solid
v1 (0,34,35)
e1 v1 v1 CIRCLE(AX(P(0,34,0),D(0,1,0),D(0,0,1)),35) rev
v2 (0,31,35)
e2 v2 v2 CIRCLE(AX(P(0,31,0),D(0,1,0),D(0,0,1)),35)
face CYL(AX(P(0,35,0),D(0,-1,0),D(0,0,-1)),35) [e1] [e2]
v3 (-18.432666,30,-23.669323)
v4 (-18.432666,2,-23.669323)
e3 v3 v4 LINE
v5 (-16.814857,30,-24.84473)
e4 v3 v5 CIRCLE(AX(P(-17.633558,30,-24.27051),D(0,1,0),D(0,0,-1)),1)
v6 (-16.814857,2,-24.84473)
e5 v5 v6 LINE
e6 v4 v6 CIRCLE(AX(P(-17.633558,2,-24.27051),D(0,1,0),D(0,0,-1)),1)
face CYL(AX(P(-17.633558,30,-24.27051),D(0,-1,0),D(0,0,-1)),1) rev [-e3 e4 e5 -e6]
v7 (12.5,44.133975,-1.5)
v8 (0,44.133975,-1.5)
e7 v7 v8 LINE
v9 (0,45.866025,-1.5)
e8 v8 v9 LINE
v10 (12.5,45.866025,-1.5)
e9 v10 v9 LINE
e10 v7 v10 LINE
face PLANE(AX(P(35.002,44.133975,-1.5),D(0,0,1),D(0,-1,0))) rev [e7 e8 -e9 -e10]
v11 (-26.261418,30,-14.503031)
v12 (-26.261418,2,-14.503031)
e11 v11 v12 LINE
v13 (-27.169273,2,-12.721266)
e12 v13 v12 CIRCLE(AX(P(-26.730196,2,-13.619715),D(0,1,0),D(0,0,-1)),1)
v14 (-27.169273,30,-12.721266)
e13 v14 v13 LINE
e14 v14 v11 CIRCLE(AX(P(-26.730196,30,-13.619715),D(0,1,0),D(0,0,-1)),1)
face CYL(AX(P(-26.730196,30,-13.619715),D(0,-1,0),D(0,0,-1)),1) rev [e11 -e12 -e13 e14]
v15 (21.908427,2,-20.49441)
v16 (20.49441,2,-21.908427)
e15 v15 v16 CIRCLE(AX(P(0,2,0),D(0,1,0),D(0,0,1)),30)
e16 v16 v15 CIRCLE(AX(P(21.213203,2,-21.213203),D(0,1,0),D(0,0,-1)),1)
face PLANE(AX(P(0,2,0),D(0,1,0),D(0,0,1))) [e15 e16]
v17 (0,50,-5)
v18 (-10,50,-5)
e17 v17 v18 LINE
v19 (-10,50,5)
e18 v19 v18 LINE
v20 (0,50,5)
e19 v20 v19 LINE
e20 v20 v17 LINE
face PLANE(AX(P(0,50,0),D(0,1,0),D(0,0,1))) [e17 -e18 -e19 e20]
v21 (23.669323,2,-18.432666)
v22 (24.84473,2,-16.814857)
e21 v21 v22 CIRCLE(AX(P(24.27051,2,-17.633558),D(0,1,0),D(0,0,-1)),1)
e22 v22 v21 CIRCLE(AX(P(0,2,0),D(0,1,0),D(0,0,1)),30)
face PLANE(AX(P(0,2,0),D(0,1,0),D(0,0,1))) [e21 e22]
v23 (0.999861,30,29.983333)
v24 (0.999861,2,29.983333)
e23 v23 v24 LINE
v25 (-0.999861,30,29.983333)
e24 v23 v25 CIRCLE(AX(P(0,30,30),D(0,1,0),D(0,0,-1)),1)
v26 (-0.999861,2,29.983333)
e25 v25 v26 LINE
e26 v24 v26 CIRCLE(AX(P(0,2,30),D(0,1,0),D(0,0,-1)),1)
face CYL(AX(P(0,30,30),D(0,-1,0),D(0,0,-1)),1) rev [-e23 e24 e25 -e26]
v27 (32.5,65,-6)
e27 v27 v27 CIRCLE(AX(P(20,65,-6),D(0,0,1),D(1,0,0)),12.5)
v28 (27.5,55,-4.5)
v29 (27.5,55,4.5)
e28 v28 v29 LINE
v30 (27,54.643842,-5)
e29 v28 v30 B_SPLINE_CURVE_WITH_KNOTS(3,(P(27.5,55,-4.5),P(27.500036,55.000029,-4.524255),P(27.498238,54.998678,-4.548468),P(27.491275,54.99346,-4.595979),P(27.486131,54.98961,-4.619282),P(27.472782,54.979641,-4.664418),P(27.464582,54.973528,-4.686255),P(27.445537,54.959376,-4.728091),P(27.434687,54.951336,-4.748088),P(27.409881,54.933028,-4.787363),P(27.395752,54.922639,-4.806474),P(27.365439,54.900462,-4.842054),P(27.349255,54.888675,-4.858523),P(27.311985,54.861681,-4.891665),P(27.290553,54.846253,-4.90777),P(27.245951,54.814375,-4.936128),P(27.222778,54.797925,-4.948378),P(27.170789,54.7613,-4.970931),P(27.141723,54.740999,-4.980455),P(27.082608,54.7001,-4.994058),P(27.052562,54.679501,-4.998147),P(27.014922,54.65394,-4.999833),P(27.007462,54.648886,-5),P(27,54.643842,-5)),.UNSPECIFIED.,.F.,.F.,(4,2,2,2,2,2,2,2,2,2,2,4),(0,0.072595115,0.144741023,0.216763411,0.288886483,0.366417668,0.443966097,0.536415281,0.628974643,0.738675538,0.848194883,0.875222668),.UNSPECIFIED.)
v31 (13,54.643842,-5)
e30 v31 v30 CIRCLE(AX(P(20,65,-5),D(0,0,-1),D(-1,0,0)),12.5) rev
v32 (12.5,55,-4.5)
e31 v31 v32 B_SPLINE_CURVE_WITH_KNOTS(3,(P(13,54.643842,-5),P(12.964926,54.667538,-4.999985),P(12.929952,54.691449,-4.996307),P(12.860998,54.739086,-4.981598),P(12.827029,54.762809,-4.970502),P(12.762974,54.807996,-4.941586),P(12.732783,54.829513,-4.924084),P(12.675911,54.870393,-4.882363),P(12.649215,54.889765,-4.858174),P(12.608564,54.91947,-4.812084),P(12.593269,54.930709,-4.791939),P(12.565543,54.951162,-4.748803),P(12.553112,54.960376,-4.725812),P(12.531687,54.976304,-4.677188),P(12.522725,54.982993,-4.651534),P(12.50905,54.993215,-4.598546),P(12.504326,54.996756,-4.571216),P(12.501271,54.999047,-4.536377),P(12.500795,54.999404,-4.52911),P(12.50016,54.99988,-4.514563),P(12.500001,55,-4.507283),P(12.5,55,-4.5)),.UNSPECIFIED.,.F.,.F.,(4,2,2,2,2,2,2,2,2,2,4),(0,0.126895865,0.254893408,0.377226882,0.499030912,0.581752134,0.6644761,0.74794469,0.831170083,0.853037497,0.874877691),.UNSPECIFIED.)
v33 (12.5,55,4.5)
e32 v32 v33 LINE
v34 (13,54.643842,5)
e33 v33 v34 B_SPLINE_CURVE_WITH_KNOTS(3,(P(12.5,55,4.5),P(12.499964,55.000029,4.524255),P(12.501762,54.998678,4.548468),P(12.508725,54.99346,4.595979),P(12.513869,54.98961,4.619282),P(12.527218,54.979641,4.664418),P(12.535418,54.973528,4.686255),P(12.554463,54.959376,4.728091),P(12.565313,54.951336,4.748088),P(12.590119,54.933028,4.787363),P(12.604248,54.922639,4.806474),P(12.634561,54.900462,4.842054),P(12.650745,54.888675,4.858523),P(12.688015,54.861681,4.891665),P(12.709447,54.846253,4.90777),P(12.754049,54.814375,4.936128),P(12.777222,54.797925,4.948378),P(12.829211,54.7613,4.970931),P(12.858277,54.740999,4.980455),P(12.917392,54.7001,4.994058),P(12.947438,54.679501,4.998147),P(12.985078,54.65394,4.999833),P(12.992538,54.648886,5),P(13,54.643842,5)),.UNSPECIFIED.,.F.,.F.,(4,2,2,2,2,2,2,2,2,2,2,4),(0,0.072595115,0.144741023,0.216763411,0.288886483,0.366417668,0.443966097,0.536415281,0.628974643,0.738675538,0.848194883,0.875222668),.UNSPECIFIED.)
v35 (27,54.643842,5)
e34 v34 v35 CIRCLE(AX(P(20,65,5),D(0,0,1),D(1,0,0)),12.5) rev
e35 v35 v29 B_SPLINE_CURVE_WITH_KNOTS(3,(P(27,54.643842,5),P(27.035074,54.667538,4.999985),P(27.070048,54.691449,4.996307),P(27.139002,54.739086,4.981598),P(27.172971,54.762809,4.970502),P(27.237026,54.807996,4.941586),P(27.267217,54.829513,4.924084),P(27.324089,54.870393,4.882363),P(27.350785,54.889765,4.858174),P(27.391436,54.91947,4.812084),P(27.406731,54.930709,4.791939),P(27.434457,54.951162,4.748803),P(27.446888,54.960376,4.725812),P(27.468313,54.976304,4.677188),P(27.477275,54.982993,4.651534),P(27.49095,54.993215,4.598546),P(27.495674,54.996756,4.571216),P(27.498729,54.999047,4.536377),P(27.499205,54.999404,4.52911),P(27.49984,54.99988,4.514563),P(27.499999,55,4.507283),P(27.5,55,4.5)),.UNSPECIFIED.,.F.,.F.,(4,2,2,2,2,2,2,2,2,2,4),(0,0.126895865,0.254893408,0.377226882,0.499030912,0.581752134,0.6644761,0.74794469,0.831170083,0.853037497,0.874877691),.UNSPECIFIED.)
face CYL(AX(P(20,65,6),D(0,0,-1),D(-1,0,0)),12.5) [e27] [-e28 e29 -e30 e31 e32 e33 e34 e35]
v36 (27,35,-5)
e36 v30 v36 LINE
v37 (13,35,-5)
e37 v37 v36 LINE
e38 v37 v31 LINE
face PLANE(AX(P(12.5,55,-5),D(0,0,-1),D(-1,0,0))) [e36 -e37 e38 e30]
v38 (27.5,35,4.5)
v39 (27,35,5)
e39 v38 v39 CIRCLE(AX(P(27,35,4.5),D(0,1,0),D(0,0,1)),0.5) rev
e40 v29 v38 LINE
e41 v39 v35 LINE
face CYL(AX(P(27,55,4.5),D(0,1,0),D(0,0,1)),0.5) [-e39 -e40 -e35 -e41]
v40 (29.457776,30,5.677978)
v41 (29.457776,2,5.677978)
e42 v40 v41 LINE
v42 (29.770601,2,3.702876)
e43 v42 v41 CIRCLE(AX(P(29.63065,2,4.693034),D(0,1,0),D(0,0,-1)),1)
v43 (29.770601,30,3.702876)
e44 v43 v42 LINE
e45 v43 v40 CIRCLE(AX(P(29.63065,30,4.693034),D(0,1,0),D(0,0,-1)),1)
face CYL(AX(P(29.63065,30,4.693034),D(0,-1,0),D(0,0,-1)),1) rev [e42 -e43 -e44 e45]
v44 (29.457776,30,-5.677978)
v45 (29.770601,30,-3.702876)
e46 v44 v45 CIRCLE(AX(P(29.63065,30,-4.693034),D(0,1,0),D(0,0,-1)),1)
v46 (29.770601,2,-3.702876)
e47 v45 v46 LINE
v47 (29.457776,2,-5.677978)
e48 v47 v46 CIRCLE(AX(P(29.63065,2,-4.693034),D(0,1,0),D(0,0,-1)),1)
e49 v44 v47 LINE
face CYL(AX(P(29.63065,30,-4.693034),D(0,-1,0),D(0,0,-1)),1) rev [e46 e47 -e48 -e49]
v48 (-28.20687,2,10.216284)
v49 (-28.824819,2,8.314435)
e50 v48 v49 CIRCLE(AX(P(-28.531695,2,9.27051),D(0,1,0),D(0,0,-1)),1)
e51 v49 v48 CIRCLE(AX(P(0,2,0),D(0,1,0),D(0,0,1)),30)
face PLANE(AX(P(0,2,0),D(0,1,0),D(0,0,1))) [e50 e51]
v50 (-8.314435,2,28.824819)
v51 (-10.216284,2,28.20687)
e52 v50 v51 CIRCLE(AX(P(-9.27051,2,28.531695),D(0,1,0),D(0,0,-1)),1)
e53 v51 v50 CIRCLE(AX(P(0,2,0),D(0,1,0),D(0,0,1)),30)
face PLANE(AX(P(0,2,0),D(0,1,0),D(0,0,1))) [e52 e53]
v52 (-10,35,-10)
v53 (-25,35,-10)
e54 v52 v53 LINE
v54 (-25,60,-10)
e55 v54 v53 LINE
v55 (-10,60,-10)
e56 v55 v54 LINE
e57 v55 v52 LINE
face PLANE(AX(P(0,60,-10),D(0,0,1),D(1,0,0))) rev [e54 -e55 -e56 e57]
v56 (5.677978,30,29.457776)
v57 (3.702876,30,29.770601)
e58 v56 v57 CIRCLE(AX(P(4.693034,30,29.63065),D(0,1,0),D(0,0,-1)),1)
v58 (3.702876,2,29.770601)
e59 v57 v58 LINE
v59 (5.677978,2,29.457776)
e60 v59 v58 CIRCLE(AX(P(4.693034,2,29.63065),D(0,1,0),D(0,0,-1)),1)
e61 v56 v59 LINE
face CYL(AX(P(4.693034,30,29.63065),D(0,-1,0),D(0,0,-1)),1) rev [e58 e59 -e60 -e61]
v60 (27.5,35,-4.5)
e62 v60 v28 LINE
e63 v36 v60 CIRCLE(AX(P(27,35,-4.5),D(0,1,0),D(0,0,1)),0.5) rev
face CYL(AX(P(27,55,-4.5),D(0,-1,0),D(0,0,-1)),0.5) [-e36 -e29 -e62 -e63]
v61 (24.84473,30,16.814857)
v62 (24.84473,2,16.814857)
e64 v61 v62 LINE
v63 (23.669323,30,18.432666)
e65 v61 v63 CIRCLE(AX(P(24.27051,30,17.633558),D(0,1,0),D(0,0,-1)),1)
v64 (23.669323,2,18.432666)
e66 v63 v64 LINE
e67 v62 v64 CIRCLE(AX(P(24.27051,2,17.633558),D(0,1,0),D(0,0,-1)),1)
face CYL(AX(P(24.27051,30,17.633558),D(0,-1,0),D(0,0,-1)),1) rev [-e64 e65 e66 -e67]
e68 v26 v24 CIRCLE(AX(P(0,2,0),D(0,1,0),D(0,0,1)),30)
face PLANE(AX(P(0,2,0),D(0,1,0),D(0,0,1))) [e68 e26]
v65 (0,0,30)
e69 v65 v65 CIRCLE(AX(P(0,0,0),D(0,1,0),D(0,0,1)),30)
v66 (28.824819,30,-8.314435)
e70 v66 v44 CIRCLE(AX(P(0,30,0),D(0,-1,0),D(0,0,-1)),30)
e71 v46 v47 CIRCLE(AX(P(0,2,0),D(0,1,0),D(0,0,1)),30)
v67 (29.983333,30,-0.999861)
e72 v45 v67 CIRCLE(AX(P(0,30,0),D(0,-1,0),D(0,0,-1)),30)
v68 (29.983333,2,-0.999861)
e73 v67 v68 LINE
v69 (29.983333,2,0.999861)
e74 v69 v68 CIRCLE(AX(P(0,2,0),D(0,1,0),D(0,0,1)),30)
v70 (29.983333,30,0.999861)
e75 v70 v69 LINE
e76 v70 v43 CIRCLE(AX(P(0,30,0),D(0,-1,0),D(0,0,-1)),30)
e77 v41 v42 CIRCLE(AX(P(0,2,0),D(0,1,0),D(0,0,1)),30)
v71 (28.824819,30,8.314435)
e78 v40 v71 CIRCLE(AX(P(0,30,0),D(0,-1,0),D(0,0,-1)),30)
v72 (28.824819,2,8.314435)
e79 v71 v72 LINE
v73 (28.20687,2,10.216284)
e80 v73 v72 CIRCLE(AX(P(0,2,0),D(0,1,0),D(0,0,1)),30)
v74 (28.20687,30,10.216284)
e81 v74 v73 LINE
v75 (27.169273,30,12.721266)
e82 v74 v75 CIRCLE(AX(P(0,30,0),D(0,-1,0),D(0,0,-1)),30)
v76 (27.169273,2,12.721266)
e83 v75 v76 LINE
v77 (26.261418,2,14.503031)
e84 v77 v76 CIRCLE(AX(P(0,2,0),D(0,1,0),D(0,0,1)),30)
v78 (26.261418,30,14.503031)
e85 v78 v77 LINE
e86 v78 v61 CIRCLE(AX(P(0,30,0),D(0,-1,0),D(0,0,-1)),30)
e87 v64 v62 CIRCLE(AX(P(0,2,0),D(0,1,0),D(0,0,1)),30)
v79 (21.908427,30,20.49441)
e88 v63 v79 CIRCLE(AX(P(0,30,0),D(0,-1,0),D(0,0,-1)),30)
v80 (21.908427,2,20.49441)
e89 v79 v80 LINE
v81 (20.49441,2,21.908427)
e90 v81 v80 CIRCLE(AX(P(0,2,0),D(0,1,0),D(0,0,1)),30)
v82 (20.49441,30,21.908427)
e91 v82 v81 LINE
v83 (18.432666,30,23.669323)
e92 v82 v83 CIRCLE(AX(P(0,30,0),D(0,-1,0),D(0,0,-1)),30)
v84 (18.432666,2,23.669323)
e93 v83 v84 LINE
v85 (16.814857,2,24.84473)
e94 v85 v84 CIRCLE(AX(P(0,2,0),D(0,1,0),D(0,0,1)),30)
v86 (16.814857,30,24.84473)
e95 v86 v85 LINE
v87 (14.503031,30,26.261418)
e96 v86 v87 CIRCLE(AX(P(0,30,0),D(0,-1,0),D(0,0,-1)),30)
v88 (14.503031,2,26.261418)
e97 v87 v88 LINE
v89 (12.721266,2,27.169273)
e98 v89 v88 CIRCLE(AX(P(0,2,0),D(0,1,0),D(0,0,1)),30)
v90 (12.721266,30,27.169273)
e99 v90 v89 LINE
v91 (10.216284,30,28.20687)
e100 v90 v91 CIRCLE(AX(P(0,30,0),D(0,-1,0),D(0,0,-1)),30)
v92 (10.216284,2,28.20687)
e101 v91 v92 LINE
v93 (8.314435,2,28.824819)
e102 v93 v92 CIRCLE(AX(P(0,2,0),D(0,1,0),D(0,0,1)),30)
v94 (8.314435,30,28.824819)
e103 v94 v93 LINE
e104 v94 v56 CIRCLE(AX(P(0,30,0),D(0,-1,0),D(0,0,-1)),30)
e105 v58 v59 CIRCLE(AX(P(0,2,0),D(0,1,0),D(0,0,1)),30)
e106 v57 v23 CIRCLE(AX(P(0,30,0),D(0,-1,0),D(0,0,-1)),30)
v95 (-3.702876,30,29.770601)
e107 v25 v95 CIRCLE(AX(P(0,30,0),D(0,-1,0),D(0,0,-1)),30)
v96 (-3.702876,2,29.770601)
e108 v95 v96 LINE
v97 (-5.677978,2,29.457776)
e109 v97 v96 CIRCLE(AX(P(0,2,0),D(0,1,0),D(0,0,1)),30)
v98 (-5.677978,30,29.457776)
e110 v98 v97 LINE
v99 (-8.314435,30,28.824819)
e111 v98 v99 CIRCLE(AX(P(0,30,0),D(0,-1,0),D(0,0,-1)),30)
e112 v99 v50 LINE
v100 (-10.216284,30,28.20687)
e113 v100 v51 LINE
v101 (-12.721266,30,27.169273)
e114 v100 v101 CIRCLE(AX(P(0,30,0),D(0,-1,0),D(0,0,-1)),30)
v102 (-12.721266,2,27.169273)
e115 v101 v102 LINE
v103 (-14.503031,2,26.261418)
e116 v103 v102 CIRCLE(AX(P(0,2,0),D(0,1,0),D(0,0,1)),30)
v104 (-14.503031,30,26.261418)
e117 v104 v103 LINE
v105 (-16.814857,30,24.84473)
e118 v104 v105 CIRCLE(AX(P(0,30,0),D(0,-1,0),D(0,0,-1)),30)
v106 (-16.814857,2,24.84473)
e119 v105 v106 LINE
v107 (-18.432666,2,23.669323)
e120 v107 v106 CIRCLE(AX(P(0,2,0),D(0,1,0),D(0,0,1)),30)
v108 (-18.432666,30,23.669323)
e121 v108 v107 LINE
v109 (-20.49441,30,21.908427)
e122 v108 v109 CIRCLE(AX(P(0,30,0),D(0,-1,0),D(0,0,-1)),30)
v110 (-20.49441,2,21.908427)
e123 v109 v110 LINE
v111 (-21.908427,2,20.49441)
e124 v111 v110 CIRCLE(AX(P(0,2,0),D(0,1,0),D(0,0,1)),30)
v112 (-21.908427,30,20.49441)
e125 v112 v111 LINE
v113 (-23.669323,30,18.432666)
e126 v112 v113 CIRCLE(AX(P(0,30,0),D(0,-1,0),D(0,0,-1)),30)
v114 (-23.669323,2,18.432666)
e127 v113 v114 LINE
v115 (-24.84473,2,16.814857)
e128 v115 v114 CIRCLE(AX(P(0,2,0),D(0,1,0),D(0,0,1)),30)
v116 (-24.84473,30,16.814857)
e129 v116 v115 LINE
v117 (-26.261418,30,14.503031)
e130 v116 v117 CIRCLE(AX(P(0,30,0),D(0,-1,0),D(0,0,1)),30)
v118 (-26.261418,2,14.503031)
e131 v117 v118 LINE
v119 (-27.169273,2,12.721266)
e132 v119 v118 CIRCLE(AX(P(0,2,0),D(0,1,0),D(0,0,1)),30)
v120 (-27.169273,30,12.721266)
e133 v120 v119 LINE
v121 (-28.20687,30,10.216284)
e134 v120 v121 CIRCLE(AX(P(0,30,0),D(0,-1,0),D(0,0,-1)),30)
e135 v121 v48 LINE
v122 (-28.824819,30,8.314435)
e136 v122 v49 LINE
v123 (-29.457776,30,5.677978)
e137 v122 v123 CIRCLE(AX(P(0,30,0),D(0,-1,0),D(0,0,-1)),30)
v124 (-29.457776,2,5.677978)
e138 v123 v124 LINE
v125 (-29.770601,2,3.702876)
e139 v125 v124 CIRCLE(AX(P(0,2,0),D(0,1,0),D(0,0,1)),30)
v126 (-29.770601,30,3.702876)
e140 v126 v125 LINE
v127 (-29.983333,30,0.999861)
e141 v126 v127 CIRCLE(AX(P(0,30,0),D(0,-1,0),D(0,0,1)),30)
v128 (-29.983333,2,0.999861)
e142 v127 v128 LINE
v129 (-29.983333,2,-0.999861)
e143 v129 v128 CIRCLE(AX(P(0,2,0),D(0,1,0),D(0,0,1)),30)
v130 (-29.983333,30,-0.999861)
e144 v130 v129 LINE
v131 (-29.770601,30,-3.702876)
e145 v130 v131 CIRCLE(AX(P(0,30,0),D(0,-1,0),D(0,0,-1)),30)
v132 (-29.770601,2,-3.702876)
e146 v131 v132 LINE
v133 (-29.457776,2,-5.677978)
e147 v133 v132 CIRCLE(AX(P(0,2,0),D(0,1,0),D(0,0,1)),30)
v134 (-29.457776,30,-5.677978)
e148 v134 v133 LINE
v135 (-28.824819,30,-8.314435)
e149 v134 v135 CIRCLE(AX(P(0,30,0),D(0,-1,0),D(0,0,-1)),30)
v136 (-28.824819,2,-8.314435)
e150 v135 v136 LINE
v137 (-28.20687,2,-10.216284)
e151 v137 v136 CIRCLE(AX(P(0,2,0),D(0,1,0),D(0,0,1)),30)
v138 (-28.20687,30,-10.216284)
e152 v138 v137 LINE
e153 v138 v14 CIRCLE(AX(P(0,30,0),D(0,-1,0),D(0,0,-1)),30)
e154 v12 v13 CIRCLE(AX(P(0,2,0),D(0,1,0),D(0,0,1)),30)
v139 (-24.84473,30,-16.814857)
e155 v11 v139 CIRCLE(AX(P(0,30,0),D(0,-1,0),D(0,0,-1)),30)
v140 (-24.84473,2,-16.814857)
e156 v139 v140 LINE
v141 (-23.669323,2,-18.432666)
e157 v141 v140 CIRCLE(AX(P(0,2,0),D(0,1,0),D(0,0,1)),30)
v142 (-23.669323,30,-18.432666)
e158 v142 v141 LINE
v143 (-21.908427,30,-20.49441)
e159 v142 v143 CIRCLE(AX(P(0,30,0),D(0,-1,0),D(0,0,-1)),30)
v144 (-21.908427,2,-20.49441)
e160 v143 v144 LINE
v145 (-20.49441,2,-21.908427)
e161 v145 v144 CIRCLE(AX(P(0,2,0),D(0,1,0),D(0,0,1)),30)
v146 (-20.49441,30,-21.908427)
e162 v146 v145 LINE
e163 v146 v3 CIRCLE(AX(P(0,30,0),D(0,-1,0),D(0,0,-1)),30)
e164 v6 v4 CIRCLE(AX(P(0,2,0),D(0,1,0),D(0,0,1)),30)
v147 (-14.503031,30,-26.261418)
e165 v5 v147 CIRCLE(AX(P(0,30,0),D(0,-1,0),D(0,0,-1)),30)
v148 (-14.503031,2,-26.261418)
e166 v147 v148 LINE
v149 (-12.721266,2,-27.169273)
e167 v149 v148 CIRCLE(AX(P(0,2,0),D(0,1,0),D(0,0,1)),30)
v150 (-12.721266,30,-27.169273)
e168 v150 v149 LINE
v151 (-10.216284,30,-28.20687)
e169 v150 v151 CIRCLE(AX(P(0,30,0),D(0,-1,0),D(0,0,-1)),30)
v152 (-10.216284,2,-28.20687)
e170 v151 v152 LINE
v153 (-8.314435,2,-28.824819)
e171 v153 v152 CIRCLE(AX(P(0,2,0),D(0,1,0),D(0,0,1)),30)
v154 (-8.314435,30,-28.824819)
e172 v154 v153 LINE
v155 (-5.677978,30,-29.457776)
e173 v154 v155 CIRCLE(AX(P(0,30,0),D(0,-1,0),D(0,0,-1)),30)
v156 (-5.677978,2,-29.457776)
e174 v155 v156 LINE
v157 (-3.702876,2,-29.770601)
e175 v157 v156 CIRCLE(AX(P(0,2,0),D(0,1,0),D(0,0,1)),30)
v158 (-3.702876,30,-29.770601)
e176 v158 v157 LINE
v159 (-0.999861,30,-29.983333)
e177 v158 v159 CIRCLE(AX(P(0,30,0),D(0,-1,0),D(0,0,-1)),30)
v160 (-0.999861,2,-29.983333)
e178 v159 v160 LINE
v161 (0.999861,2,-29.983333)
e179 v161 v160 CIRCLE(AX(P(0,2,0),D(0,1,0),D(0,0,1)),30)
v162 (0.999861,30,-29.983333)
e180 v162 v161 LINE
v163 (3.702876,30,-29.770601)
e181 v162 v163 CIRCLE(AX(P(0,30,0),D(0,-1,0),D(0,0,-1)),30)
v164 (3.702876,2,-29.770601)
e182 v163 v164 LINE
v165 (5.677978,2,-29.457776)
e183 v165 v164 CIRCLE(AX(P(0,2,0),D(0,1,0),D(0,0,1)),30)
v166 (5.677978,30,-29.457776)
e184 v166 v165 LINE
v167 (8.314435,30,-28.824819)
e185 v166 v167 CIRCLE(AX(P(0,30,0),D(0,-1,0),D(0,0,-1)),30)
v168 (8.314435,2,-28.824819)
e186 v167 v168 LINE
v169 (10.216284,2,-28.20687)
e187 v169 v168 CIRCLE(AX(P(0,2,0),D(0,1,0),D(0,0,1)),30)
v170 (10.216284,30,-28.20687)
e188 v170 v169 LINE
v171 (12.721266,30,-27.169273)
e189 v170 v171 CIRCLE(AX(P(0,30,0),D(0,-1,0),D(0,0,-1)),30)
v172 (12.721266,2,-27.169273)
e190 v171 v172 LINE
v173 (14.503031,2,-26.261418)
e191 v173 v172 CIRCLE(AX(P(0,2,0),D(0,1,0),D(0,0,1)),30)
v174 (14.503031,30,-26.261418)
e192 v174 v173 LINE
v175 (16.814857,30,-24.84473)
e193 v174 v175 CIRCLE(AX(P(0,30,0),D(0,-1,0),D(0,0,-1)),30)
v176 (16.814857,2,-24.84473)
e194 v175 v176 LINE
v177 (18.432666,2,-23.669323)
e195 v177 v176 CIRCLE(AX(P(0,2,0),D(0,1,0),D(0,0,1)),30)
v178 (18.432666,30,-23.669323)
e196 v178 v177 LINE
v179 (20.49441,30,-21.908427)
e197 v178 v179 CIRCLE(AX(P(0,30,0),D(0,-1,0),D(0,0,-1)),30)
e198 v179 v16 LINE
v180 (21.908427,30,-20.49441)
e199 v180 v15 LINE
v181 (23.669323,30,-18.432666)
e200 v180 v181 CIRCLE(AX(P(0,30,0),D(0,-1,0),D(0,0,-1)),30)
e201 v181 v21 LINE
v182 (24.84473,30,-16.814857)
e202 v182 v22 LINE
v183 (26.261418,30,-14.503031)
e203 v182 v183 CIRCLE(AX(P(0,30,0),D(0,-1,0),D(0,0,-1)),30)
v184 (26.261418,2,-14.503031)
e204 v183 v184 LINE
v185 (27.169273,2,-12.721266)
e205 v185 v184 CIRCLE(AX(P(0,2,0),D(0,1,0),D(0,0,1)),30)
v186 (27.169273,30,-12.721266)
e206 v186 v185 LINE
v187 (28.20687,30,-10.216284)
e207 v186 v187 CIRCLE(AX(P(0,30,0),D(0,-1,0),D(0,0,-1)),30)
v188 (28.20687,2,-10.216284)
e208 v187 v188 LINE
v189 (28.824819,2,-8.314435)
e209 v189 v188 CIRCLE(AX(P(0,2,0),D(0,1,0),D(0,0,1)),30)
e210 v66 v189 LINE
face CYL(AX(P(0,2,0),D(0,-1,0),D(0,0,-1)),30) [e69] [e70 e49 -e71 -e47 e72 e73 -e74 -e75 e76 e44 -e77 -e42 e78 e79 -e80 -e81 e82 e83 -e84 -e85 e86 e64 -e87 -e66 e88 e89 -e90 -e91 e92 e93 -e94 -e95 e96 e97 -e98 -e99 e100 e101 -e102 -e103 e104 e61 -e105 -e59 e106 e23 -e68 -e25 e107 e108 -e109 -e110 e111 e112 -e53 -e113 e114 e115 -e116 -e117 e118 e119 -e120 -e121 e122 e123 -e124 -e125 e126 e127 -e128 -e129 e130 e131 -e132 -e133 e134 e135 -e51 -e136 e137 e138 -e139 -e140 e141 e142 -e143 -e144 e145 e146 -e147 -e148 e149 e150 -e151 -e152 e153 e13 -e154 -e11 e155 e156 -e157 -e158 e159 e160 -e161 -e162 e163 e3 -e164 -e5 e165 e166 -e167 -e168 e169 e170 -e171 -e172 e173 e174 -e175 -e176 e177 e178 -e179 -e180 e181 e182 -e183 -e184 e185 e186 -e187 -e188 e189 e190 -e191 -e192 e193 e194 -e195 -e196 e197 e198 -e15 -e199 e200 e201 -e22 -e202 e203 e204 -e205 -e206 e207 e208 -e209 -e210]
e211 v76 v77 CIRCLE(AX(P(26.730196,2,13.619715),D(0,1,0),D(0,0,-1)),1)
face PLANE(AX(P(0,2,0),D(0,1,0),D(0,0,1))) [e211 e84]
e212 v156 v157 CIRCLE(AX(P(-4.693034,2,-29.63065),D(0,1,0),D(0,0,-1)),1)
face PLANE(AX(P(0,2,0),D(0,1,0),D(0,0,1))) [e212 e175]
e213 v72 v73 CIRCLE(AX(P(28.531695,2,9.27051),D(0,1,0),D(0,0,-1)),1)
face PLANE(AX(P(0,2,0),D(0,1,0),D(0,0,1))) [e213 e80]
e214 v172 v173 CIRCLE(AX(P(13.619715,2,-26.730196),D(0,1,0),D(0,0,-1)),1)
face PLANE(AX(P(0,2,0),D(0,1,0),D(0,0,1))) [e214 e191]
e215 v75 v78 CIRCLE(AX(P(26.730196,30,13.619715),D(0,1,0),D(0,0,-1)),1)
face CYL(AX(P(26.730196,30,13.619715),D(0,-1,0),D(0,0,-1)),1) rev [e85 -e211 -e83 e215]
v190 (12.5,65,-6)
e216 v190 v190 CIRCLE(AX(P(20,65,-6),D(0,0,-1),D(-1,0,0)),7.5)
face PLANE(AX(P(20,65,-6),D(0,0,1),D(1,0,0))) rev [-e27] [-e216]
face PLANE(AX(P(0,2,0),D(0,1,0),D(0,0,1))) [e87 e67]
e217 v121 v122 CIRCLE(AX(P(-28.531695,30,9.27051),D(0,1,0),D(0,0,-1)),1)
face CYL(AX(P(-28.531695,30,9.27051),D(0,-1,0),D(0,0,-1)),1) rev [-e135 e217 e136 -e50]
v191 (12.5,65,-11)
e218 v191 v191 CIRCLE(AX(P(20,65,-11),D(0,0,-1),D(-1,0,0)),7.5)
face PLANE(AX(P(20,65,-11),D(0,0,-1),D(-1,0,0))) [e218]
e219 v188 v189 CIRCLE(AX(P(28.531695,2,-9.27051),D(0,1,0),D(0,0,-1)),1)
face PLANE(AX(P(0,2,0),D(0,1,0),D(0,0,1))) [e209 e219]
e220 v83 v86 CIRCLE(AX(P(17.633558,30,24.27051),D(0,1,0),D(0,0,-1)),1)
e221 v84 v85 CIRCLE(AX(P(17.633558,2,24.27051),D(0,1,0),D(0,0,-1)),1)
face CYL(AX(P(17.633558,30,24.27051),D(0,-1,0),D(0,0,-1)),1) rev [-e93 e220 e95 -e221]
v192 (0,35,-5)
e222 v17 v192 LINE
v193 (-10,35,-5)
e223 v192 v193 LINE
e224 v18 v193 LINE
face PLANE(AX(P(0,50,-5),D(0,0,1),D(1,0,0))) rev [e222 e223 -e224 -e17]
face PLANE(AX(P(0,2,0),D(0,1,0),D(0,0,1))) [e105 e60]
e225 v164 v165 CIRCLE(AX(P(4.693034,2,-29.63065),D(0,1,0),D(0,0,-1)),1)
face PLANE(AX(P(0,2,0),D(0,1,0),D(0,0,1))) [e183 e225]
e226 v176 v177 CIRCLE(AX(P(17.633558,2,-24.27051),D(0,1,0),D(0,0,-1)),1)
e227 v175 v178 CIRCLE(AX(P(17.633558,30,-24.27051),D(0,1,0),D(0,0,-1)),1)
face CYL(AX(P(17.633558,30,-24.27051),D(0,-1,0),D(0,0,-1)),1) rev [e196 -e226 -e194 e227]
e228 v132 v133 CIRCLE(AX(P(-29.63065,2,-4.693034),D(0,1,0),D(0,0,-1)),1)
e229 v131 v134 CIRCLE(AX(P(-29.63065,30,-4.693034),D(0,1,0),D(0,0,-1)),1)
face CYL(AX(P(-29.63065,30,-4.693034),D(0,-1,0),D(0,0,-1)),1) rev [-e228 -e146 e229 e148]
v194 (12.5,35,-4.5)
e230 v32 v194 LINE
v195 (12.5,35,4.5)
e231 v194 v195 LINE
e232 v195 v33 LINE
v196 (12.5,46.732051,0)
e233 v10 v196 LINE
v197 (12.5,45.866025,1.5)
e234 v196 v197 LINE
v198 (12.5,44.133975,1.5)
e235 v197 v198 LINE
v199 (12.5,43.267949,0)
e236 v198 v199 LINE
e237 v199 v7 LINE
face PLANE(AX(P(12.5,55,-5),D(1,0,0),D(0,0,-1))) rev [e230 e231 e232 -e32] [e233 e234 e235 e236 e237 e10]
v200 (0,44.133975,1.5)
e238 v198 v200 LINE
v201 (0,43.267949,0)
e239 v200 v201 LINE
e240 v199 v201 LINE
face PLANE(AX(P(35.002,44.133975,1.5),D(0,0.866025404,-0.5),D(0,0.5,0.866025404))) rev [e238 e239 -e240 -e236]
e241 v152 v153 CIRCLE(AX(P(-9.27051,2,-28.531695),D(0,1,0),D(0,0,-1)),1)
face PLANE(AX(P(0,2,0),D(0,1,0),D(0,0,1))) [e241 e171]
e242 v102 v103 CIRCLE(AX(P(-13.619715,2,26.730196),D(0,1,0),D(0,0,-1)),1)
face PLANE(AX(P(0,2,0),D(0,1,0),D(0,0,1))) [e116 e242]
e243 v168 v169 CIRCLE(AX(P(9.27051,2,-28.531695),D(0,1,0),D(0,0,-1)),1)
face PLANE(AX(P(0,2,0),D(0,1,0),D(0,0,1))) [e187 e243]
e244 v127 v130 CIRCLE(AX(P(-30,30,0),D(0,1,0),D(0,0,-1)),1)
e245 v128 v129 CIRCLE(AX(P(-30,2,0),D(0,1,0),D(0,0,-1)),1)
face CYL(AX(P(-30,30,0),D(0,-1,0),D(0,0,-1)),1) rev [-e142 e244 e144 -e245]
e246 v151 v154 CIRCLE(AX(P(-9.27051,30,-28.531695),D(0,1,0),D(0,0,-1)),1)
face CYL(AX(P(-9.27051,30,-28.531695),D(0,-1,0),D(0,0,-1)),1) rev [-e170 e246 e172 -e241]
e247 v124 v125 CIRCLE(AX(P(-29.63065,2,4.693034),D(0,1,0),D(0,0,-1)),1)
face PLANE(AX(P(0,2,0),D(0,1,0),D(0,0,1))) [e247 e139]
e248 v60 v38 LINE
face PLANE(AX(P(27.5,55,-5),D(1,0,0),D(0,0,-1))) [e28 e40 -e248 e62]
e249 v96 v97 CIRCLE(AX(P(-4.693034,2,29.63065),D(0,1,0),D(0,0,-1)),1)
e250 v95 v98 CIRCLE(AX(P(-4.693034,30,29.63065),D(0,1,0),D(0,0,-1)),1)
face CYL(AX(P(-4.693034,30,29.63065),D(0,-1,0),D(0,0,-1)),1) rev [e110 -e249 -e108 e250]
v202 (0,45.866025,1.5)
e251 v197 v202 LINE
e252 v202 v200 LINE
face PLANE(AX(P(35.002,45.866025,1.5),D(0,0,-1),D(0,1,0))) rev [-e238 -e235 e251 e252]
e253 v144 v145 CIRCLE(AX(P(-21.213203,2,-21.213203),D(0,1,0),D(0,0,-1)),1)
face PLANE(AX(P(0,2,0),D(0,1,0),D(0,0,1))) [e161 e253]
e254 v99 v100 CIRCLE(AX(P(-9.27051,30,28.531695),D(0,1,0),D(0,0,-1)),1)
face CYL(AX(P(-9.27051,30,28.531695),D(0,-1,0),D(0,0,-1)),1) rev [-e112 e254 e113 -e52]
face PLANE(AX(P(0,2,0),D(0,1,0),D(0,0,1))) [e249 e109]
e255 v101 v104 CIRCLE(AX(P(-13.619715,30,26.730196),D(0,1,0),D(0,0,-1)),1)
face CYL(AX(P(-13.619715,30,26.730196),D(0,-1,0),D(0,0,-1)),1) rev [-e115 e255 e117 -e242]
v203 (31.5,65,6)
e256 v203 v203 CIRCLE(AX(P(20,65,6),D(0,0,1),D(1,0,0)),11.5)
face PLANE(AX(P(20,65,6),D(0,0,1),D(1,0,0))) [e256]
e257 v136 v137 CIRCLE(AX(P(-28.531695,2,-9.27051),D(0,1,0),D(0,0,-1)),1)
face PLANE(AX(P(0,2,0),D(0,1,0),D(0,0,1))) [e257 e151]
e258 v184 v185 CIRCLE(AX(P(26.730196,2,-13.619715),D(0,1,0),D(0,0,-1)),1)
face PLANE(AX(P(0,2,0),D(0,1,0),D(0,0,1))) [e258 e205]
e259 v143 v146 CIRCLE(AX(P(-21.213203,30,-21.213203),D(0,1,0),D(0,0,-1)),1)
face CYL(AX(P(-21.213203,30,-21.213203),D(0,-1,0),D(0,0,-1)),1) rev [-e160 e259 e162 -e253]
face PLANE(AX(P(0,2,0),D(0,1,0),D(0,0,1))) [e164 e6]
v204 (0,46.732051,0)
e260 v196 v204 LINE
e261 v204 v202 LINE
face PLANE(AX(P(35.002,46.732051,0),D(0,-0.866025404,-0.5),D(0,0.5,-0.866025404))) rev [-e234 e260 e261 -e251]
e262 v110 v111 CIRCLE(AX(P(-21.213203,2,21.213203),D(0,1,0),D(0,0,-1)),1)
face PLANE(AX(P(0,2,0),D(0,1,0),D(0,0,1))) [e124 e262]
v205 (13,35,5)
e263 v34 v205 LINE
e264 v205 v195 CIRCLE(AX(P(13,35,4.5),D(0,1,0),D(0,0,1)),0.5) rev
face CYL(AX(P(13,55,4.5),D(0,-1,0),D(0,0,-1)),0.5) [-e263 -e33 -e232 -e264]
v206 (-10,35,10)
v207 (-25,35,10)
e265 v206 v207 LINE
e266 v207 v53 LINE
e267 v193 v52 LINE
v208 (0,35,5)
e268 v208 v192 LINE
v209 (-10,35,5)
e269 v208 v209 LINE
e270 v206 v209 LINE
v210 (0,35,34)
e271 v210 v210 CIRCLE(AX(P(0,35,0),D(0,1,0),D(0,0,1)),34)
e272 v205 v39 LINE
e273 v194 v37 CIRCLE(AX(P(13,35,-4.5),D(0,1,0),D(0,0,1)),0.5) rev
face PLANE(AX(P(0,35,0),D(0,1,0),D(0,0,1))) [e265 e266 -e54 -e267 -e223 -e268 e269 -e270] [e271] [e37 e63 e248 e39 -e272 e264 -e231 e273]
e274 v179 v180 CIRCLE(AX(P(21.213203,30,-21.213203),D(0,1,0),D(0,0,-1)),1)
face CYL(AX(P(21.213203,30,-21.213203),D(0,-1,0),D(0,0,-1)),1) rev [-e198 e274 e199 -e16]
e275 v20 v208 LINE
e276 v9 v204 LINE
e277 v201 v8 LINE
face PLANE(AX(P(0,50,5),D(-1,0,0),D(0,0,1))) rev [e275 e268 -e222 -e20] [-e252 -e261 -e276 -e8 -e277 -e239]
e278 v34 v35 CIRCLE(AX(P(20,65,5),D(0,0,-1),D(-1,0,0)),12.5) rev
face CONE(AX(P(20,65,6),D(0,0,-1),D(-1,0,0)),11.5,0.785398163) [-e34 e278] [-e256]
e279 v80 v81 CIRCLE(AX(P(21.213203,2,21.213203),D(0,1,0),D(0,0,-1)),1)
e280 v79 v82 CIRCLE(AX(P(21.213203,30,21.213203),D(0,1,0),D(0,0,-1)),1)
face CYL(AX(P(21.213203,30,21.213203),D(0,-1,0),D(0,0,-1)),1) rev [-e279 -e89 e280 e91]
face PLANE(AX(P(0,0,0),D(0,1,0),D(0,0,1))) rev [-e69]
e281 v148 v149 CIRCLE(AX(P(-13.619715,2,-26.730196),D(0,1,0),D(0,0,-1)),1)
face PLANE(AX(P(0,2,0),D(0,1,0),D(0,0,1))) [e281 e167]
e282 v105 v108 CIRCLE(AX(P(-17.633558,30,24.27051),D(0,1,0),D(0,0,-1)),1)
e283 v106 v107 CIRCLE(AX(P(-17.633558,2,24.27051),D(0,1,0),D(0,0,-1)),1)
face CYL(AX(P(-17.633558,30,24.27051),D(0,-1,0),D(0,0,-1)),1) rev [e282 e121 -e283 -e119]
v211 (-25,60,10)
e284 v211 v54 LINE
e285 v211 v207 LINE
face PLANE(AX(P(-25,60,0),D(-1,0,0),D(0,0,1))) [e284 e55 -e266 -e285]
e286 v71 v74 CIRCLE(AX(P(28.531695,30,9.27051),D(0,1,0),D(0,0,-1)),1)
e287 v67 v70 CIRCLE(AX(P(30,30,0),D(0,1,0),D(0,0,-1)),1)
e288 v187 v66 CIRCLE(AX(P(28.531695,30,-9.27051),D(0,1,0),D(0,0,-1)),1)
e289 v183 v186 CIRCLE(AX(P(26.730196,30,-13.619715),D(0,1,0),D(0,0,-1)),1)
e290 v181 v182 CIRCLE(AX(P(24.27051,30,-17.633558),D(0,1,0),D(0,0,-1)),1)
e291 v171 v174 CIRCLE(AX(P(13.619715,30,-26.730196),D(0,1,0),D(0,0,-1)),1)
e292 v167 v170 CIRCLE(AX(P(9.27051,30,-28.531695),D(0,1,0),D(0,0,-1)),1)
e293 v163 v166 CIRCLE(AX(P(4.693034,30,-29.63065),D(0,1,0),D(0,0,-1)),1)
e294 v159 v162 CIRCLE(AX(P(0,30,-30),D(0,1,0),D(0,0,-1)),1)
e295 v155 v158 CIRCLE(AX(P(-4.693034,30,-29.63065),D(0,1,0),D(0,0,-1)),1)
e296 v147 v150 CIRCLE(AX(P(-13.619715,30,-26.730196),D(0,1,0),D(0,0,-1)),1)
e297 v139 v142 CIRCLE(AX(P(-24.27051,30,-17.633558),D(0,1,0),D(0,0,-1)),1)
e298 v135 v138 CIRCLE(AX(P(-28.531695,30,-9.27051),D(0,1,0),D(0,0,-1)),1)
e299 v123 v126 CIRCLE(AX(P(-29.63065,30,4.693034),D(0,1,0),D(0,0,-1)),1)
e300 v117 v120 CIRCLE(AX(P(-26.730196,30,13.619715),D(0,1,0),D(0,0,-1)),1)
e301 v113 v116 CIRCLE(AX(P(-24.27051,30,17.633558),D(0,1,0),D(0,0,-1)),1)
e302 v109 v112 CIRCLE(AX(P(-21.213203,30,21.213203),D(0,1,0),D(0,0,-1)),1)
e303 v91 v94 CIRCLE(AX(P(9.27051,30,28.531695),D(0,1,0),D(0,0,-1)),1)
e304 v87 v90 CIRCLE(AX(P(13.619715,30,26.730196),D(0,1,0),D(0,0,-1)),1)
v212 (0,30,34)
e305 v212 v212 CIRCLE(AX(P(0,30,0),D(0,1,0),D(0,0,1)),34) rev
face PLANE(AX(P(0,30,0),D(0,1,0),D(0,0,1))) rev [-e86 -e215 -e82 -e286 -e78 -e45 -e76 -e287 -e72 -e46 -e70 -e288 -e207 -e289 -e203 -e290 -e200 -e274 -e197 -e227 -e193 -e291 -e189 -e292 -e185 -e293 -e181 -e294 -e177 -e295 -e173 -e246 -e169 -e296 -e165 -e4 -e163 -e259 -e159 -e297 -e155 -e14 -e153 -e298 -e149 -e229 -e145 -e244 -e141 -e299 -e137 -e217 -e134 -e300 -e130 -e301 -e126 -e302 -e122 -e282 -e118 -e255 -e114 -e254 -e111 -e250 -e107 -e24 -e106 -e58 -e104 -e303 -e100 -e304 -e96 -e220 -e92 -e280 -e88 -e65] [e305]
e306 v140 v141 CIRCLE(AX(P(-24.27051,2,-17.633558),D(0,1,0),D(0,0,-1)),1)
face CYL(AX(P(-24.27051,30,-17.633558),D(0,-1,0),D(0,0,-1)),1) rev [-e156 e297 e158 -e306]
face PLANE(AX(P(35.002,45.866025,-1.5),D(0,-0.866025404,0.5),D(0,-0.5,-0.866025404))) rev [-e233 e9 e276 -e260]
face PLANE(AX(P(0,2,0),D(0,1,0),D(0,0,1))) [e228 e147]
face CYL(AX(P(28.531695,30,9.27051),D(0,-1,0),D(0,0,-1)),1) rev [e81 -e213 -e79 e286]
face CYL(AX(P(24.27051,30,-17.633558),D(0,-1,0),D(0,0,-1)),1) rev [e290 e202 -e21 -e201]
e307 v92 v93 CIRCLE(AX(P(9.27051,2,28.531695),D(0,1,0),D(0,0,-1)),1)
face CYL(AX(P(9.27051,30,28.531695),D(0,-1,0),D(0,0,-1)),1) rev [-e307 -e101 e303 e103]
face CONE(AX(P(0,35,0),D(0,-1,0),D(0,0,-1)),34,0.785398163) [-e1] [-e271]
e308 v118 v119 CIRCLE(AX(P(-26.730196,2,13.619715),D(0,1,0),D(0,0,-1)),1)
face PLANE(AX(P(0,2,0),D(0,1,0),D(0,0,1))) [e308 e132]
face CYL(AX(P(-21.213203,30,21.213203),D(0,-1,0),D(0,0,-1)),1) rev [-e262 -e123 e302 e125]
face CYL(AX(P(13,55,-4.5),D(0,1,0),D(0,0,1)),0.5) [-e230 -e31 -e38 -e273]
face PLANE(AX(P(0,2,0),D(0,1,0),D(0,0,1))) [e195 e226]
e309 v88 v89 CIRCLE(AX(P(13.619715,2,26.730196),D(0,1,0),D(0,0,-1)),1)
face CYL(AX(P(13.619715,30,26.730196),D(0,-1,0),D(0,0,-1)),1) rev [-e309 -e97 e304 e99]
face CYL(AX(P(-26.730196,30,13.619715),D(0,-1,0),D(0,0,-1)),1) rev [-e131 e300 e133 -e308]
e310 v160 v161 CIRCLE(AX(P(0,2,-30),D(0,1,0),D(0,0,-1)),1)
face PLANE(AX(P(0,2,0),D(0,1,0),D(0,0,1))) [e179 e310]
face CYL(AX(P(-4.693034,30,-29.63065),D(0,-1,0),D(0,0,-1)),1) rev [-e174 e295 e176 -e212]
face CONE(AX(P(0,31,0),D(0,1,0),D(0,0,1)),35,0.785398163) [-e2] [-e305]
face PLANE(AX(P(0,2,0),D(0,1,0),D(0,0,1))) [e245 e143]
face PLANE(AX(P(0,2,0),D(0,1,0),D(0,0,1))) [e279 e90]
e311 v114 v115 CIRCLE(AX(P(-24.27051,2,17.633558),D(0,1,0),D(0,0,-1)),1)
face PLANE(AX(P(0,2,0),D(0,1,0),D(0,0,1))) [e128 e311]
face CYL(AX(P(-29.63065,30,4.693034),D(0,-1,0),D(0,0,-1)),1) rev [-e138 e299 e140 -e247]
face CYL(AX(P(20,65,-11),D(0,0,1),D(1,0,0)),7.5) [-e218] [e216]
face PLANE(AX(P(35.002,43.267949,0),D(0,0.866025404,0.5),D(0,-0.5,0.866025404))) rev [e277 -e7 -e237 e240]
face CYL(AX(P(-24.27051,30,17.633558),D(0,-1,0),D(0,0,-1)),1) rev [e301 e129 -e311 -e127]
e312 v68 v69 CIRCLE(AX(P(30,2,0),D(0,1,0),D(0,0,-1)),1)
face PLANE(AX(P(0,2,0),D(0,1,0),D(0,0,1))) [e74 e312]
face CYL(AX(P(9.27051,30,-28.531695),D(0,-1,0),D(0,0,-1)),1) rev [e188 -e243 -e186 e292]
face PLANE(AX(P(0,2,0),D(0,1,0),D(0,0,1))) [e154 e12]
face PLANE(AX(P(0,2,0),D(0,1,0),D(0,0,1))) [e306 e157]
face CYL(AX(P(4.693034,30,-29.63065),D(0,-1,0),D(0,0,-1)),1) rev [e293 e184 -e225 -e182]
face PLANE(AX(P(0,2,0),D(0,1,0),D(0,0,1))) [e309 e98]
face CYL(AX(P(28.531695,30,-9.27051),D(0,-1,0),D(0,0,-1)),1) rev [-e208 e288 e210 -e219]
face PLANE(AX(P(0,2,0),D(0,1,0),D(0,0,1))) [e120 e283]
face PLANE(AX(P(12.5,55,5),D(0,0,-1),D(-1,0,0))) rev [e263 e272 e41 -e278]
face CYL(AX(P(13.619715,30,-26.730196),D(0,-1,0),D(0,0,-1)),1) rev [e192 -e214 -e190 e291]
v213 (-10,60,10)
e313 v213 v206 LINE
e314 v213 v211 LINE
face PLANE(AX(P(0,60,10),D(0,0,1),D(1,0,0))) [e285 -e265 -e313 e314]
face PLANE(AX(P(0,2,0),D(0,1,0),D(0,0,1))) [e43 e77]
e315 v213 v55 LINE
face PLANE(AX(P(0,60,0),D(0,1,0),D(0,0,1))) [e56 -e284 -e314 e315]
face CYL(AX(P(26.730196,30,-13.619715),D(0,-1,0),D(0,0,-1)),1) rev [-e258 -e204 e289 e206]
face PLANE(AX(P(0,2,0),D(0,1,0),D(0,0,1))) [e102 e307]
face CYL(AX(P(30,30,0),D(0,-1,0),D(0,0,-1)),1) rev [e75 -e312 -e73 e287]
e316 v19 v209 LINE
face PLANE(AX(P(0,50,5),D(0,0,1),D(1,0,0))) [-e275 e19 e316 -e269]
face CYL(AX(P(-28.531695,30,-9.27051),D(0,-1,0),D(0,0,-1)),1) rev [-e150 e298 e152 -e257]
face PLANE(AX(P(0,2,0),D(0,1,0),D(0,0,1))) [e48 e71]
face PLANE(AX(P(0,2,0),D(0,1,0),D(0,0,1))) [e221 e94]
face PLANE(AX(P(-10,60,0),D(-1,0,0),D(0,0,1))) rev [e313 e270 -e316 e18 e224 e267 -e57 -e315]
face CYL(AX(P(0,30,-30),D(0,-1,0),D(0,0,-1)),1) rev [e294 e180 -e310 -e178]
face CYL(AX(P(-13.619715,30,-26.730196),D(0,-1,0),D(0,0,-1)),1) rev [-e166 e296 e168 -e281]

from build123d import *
from build123d.topology import SkipClean

# Parameters (mm, degrees)
SKETCH1_R                = 30
BOSS_EXTRUDE1_DEPTH      = 2
BOSS_EXTRUDE2_DEPTH      = 28
SKETCH3_R                = 35
BOSS_EXTRUDE3_DEPTH      = 5
SKETCH4_W                = 15
SKETCH4_H                = 20
BOSS_EXTRUDE4_DEPTH      = 25
SKETCH4_3_W              = 10
SKETCH4_3_H              = 10
BOSS_EXTRUDE5_DEPTH      = 15
SKETCH4_4_W              = 15
SKETCH4_4_H              = 10
BOSS_EXTRUDE6_DEPTH      = 20
BOSS_EXTRUDE7_DEPTH      = 1
BOSS_EXTRUDE7_DEPTH_BACK = 11
SKETCH5_R                = 12.5
SKETCH6_R                = 7.5
BOSS_EXTRUDE8_DEPTH      = 5
BOSS_EXTRUDE9_REACH      = 93.958
CHAMFER1_SIZE            = 1
FILLET1_R                = 0.5
CHAMFER2_SIZE            = 1


# Some blends are built 0.0001 mm under size
with BuildPart() as part:
    # Sketch1 → Boss-Extrude1 (new body)
    with BuildSketch(Plane(origin=(0, 0, 0), x_dir=(1, 0, 0), z_dir=(0, 1, 0))):
        with Locations(Location((0, 0, 0), (0, 0, 270))):
            Circle(SKETCH1_R)
    extrude(amount=BOSS_EXTRUDE1_DEPTH)

    # Sketch2 → Boss-Extrude2 (add)
    with SkipClean():  # the faces are left unmerged after this step: merging them gives an invalid solid
        with BuildSketch(Plane(origin=(0, 2, 0), x_dir=(-1, 0, 0), z_dir=(0, -1, 0))):
            with BuildLine():
                ThreePointArc((-0.999861101, 29.983333333), (-2.353772872, 29.907520012), (-3.702875558, 29.770601482))
                ThreePointArc((-3.702875558, 29.770601482), (-4.536599486, 28.642961877), (-5.677977862, 29.457776009))
                ThreePointArc((-5.677977862, 29.457776009), (-7.003360916, 29.171097612), (-8.314435132, 28.824818619))
                ThreePointArc((-8.314435132, 28.824818619), (-8.961492837, 27.580638973), (-10.216283964, 28.206870475))
                ThreePointArc((-10.216283964, 28.206870475), (-11.480502971, 27.716385975), (-12.721265719, 27.169273058))
                ThreePointArc((-12.721265719, 27.169273058), (-13.165724492, 25.839189201), (-14.503031249, 26.261418176))
                ThreePointArc((-14.503031249, 26.261418176), (-15.674956941, 25.579204931), (-16.814856525, 24.844729824))
                ThreePointArc((-16.814856525, 24.844729824), (-17.045772316, 23.461492837), (-18.432665771, 23.669322605))
                ThreePointArc((-18.432665771, 23.669322605), (-19.48344145, 22.812178968), (-20.494409757, 21.908426888))
                ThreePointArc((-20.494409757, 21.908426888), (-20.506096654, 20.506096654), (-21.908426888, 20.494409757))
                ThreePointArc((-21.908426888, 20.494409757), (-22.812178968, 19.48344145), (-23.669322605, 18.432665771))
                ThreePointArc((-23.669322605, 18.432665771), (-23.461492837, 17.045772316), (-24.844729824, 16.814856525))
                ThreePointArc((-24.844729824, 16.814856525), (-25.579204931, 15.674956941), (-26.261418176, 14.503031249))
                ThreePointArc((-26.261418176, 14.503031249), (-25.839189201, 13.165724492), (-27.169273058, 12.721265719))
                ThreePointArc((-27.169273058, 12.721265719), (-27.716385975, 11.480502971), (-28.206870475, 10.216283964))
                ThreePointArc((-28.206870475, 10.216283964), (-27.580638973, 8.961492837), (-28.824818619, 8.314435132))
                ThreePointArc((-28.824818619, 8.314435132), (-29.171097612, 7.003360916), (-29.457776009, 5.677977862))
                ThreePointArc((-29.457776009, 5.677977862), (-28.642961877, 4.536599486), (-29.770601482, 3.702875558))
                ThreePointArc((-29.770601482, 3.702875558), (-29.907520012, 2.353772872), (-29.983333333, 0.999861101))
                ThreePointArc((-29.983333333, 0.999861101), (-29, 0), (-29.983333333, -0.999861101))
                ThreePointArc((-29.983333333, -0.999861101), (-29.907520012, -2.353772872), (-29.770601482, -3.702875558))
                ThreePointArc((-29.770601482, -3.702875558), (-28.642961877, -4.536599486), (-29.457776009, -5.677977862))
                ThreePointArc((-29.457776009, -5.677977862), (-29.171097612, -7.003360916), (-28.824818619, -8.314435132))
                ThreePointArc((-28.824818619, -8.314435132), (-27.580638973, -8.961492837), (-28.206870475, -10.216283964))
                ThreePointArc((-28.206870475, -10.216283964), (-27.716385975, -11.480502971), (-27.169273058, -12.721265719))
                ThreePointArc((-27.169273058, -12.721265719), (-25.839189201, -13.165724492), (-26.261418176, -14.503031249))
                ThreePointArc((-26.261418176, -14.503031249), (-25.579204931, -15.674956941), (-24.844729824, -16.814856525))
                ThreePointArc((-24.844729824, -16.814856525), (-23.461492837, -17.045772316), (-23.669322605, -18.432665771))
                ThreePointArc((-23.669322605, -18.432665771), (-22.812178968, -19.48344145), (-21.908426888, -20.494409757))
                ThreePointArc((-21.908426888, -20.494409757), (-20.506096654, -20.506096654), (-20.494409757, -21.908426888))
                ThreePointArc((-20.494409757, -21.908426888), (-19.48344145, -22.812178968), (-18.432665771, -23.669322605))
                ThreePointArc((-18.432665771, -23.669322605), (-17.045772316, -23.461492837), (-16.814856525, -24.844729824))
                ThreePointArc((-16.814856525, -24.844729824), (-15.674956941, -25.579204931), (-14.503031249, -26.261418176))
                ThreePointArc((-14.503031249, -26.261418176), (-13.165724492, -25.839189201), (-12.721265719, -27.169273058))
                ThreePointArc((-12.721265719, -27.169273058), (-11.480502971, -27.716385975), (-10.216283964, -28.206870475))
                ThreePointArc((-10.216283964, -28.206870475), (-8.961492837, -27.580638973), (-8.314435132, -28.824818619))
                ThreePointArc((-8.314435132, -28.824818619), (-7.003360916, -29.171097612), (-5.677977862, -29.457776009))
                ThreePointArc((-5.677977862, -29.457776009), (-4.536599486, -28.642961877), (-3.702875558, -29.770601482))
                ThreePointArc((-3.702875558, -29.770601482), (-2.353772872, -29.907520012), (-0.999861101, -29.983333333))
                ThreePointArc((-0.999861101, -29.983333333), (0, -29), (0.999861101, -29.983333333))
                ThreePointArc((0.999861101, -29.983333333), (2.353772872, -29.907520012), (3.702875558, -29.770601482))
                ThreePointArc((3.702875558, -29.770601482), (4.536599486, -28.642961877), (5.677977862, -29.457776009))
                ThreePointArc((5.677977862, -29.457776009), (7.003360916, -29.171097612), (8.314435132, -28.824818619))
                ThreePointArc((8.314435132, -28.824818619), (8.961492837, -27.580638973), (10.216283964, -28.206870475))
                ThreePointArc((10.216283964, -28.206870475), (11.480502971, -27.716385975), (12.721265719, -27.169273058))
                ThreePointArc((12.721265719, -27.169273058), (13.165724492, -25.839189201), (14.503031249, -26.261418176))
                ThreePointArc((14.503031249, -26.261418176), (15.674956941, -25.579204931), (16.814856525, -24.844729824))
                ThreePointArc((16.814856525, -24.844729824), (17.045772316, -23.461492837), (18.432665771, -23.669322605))
                ThreePointArc((18.432665771, -23.669322605), (19.48344145, -22.812178968), (20.494409757, -21.908426888))
                ThreePointArc((20.494409757, -21.908426888), (20.506096654, -20.506096654), (21.908426888, -20.494409757))
                ThreePointArc((21.908426888, -20.494409757), (22.812178968, -19.48344145), (23.669322605, -18.432665771))
                ThreePointArc((23.669322605, -18.432665771), (23.461492837, -17.045772316), (24.844729824, -16.814856525))
                ThreePointArc((24.844729824, -16.814856525), (25.579204931, -15.674956941), (26.261418176, -14.503031249))
                ThreePointArc((26.261418176, -14.503031249), (25.839189201, -13.165724492), (27.169273058, -12.721265719))
                ThreePointArc((27.169273058, -12.721265719), (27.716385975, -11.480502971), (28.206870475, -10.216283964))
                ThreePointArc((28.206870475, -10.216283964), (27.580638973, -8.961492837), (28.824818619, -8.314435132))
                ThreePointArc((28.824818619, -8.314435132), (29.171097612, -7.003360916), (29.457776009, -5.677977862))
                ThreePointArc((29.457776009, -5.677977862), (28.642961877, -4.536599486), (29.770601482, -3.702875558))
                ThreePointArc((29.770601482, -3.702875558), (29.907520012, -2.353772872), (29.983333333, -0.999861101))
                ThreePointArc((29.983333333, -0.999861101), (29, 0), (29.983333333, 0.999861101))
                ThreePointArc((29.983333333, 0.999861101), (29.907520012, 2.353772872), (29.770601482, 3.702875558))
                ThreePointArc((29.770601482, 3.702875558), (28.642961877, 4.536599486), (29.457776009, 5.677977862))
                ThreePointArc((29.457776009, 5.677977862), (29.171097612, 7.003360916), (28.824818619, 8.314435132))
                ThreePointArc((28.824818619, 8.314435132), (27.580638973, 8.961492837), (28.206870475, 10.216283964))
                ThreePointArc((28.206870475, 10.216283964), (27.716385975, 11.480502971), (27.169273058, 12.721265719))
                ThreePointArc((27.169273058, 12.721265719), (25.839189201, 13.165724492), (26.261418176, 14.503031249))
                ThreePointArc((26.261418176, 14.503031249), (25.579204931, 15.674956941), (24.844729824, 16.814856525))
                ThreePointArc((24.844729824, 16.814856525), (23.461492837, 17.045772316), (23.669322605, 18.432665771))
                ThreePointArc((23.669322605, 18.432665771), (22.812178968, 19.48344145), (21.908426888, 20.494409757))
                ThreePointArc((21.908426888, 20.494409757), (20.506096654, 20.506096654), (20.494409757, 21.908426888))
                ThreePointArc((20.494409757, 21.908426888), (19.48344145, 22.812178968), (18.432665771, 23.669322605))
                ThreePointArc((18.432665771, 23.669322605), (17.045772316, 23.461492837), (16.814856525, 24.844729824))
                ThreePointArc((16.814856525, 24.844729824), (15.674956941, 25.579204931), (14.503031249, 26.261418176))
                ThreePointArc((14.503031249, 26.261418176), (13.165724492, 25.839189201), (12.721265719, 27.169273058))
                ThreePointArc((12.721265719, 27.169273058), (11.480502971, 27.716385975), (10.216283964, 28.206870475))
                ThreePointArc((10.216283964, 28.206870475), (8.961492837, 27.580638973), (8.314435132, 28.824818619))
                ThreePointArc((8.314435132, 28.824818619), (7.003360916, 29.171097612), (5.677977862, 29.457776009))
                ThreePointArc((5.677977862, 29.457776009), (4.536599486, 28.642961877), (3.702875558, 29.770601482))
                ThreePointArc((3.702875558, 29.770601482), (2.353772872, 29.907520012), (0.999861101, 29.983333333))
                ThreePointArc((0.999861101, 29.983333333), (0, 29), (-0.999861101, 29.983333333))
            make_face()
        extrude(amount=-BOSS_EXTRUDE2_DEPTH)

    # Sketch3 → Boss-Extrude3 (add)
    with BuildSketch(Plane(origin=(0, 30, 0), x_dir=(1, 0, 0), z_dir=(0, 1, 0))):
        with Locations(Location((0, 0, 0), (0, 0, 270))):
            Circle(SKETCH3_R)
    extrude(amount=BOSS_EXTRUDE3_DEPTH)

    # Sketch4 → Boss-Extrude4 (add)
    with BuildSketch(Plane(origin=(0, 35, 0), x_dir=(1, 0, 0), z_dir=(0, 1, 0))):
        with Locations((-17.5, 0)):
            Rectangle(SKETCH4_W, SKETCH4_H)
    extrude(amount=BOSS_EXTRUDE4_DEPTH)

    # Sketch4<3> → Boss-Extrude5 (add)
    with BuildSketch(Plane(origin=(0, 35, 0), x_dir=(1, 0, 0), z_dir=(0, 1, 0))):
        with Locations((-5, 0)):
            Rectangle(SKETCH4_3_W, SKETCH4_3_H)
    extrude(amount=BOSS_EXTRUDE5_DEPTH)

    # Sketch4<4> → Boss-Extrude6 (add)
    with BuildSketch(Plane(origin=(0, 35, 0), x_dir=(1, 0, 0), z_dir=(0, 1, 0))):
        with Locations((20, 0)):
            Rectangle(SKETCH4_4_W, SKETCH4_4_H)
    extrude(amount=BOSS_EXTRUDE6_DEPTH)

    # Sketch5 → Boss-Extrude7 (add, two sides: drawn at the far end of the back side and taken through both)
    with BuildSketch(Plane.XY.offset(5).offset(-BOSS_EXTRUDE7_DEPTH_BACK)):
        with Locations((20, 65)):
            Circle(SKETCH5_R)
    extrude(amount=BOSS_EXTRUDE7_DEPTH + BOSS_EXTRUDE7_DEPTH_BACK)

    # Sketch6 → Boss-Extrude8 (add)
    with BuildSketch(Plane(origin=(0, 0, -6), x_dir=(-1, 0, 0), z_dir=(0, 0, -1))):
        with Locations((-20, 65)):
            Circle(SKETCH6_R)
    extrude(amount=BOSS_EXTRUDE8_DEPTH)

    # Sketch7 → Boss-Extrude9 (add, up to next)
    with BuildSketch(Plane(origin=(0, 0, 0), x_dir=(0, 0, -1), z_dir=(1, 0, 0)), mode=Mode.PRIVATE) as boss_extrude9_sk1:
        Polygon((0, 46.732050808), (-1.5, 45.866025404), (-1.5, 44.133974596), (0, 43.267949192), (1.5, 44.133974596), (1.5, 45.866025404), align=None)
    boss_extrude9_tool1 = extrude(boss_extrude9_sk1.sketch, amount=BOSS_EXTRUDE9_REACH, mode=Mode.PRIVATE) - part.part
    add(boss_extrude9_tool1.solids().sort_by_distance((0, 45, 0))[0])

    # Chamfer1
    chamfer1_edges = [part.edges().sort_by_distance(p)[0] for p in [
        (0, 30, -35),
        (0, 35, -35),
    ]]
    chamfer(chamfer1_edges, length=CHAMFER1_SIZE)

    # Fillet1
    # the kernel refuses this fillet: 0.5 mm, written as the material it takes off along each edge
    with BuildSketch(Plane(origin=(12.5, 35, -5), x_dir=(0, 0, 1), z_dir=(0, 1, 0))) as fillet1_piece_1_section:
        with BuildLine():
            CenterArc((FILLET1_R, FILLET1_R), FILLET1_R, 180, 90)
            Line((0, FILLET1_R), (0, 0))
            Line((0, 0), (FILLET1_R, 0))
        make_face()
    fillet1_piece_1 = extrude(amount=21.25, mode=Mode.PRIVATE)
    fillet1_piece_1 = fillet1_piece_1 - Plane(origin=(20, 65, -4.88655171), x_dir=(1, 0, 0), z_dir=(0, 0, 1)) * Cylinder(12.5, 45, mode=Mode.PRIVATE)
    add(fillet1_piece_1, mode=Mode.SUBTRACT)
    with BuildSketch(Plane(origin=(12.5, 35, 5), x_dir=(0, 0, -1), z_dir=(0, 1, 0))) as fillet1_piece_2_section:
        with BuildLine():
            CenterArc((FILLET1_R, -FILLET1_R), FILLET1_R, 90, 90)
            Line((0, -FILLET1_R), (0, 0))
            Line((0, 0), (FILLET1_R, 0))
        make_face()
    fillet1_piece_2 = extrude(amount=21.25, mode=Mode.PRIVATE)
    fillet1_piece_2 = fillet1_piece_2 - Plane(origin=(20, 65, 4.88655171), x_dir=(1, 0, 0), z_dir=(0, 0, 1)) * Cylinder(12.5, 45, mode=Mode.PRIVATE)
    add(fillet1_piece_2, mode=Mode.SUBTRACT)
    with BuildSketch(Plane(origin=(27.5, 35, 5), x_dir=(-1, 0, 0), z_dir=(0, 1, 0))) as fillet1_piece_3_section:
        with BuildLine():
            CenterArc((FILLET1_R, -FILLET1_R), FILLET1_R, 90, 90)
            Line((0, -FILLET1_R), (0, 0))
            Line((0, 0), (FILLET1_R, 0))
        make_face()
    fillet1_piece_3 = extrude(amount=21.25, mode=Mode.PRIVATE)
    fillet1_piece_3 = fillet1_piece_3 - Plane(origin=(20, 65, 4.886551682), x_dir=(1, 0, 0), z_dir=(0, 0, -1)) * Cylinder(12.5, 45, mode=Mode.PRIVATE)
    add(fillet1_piece_3, mode=Mode.SUBTRACT)
    with BuildSketch(Plane(origin=(27.5, 35, -5), x_dir=(0, 0, 1), z_dir=(0, 1, 0))) as fillet1_piece_4_section:
        with BuildLine():
            CenterArc((FILLET1_R, -FILLET1_R), FILLET1_R, 90, 90)
            Line((0, -FILLET1_R), (0, 0))
            Line((0, 0), (FILLET1_R, 0))
        make_face()
    fillet1_piece_4 = extrude(amount=21.25, mode=Mode.PRIVATE)
    fillet1_piece_4 = fillet1_piece_4 - Plane(origin=(20, 65, -4.886551683), x_dir=(1, 0, 0), z_dir=(0, 0, 1)) * Cylinder(12.5, 45, mode=Mode.PRIVATE)
    add(fillet1_piece_4, mode=Mode.SUBTRACT)

    # Chamfer2
    chamfer2_edges = [part.edges().sort_by_distance(p)[0] for p in [
        (7.5, 65, 6),
    ]]
    chamfer(chamfer2_edges, length=CHAMFER2_SIZE - 0.0001)  # a hair under: the kernel refuses the full size


solid = part.part
